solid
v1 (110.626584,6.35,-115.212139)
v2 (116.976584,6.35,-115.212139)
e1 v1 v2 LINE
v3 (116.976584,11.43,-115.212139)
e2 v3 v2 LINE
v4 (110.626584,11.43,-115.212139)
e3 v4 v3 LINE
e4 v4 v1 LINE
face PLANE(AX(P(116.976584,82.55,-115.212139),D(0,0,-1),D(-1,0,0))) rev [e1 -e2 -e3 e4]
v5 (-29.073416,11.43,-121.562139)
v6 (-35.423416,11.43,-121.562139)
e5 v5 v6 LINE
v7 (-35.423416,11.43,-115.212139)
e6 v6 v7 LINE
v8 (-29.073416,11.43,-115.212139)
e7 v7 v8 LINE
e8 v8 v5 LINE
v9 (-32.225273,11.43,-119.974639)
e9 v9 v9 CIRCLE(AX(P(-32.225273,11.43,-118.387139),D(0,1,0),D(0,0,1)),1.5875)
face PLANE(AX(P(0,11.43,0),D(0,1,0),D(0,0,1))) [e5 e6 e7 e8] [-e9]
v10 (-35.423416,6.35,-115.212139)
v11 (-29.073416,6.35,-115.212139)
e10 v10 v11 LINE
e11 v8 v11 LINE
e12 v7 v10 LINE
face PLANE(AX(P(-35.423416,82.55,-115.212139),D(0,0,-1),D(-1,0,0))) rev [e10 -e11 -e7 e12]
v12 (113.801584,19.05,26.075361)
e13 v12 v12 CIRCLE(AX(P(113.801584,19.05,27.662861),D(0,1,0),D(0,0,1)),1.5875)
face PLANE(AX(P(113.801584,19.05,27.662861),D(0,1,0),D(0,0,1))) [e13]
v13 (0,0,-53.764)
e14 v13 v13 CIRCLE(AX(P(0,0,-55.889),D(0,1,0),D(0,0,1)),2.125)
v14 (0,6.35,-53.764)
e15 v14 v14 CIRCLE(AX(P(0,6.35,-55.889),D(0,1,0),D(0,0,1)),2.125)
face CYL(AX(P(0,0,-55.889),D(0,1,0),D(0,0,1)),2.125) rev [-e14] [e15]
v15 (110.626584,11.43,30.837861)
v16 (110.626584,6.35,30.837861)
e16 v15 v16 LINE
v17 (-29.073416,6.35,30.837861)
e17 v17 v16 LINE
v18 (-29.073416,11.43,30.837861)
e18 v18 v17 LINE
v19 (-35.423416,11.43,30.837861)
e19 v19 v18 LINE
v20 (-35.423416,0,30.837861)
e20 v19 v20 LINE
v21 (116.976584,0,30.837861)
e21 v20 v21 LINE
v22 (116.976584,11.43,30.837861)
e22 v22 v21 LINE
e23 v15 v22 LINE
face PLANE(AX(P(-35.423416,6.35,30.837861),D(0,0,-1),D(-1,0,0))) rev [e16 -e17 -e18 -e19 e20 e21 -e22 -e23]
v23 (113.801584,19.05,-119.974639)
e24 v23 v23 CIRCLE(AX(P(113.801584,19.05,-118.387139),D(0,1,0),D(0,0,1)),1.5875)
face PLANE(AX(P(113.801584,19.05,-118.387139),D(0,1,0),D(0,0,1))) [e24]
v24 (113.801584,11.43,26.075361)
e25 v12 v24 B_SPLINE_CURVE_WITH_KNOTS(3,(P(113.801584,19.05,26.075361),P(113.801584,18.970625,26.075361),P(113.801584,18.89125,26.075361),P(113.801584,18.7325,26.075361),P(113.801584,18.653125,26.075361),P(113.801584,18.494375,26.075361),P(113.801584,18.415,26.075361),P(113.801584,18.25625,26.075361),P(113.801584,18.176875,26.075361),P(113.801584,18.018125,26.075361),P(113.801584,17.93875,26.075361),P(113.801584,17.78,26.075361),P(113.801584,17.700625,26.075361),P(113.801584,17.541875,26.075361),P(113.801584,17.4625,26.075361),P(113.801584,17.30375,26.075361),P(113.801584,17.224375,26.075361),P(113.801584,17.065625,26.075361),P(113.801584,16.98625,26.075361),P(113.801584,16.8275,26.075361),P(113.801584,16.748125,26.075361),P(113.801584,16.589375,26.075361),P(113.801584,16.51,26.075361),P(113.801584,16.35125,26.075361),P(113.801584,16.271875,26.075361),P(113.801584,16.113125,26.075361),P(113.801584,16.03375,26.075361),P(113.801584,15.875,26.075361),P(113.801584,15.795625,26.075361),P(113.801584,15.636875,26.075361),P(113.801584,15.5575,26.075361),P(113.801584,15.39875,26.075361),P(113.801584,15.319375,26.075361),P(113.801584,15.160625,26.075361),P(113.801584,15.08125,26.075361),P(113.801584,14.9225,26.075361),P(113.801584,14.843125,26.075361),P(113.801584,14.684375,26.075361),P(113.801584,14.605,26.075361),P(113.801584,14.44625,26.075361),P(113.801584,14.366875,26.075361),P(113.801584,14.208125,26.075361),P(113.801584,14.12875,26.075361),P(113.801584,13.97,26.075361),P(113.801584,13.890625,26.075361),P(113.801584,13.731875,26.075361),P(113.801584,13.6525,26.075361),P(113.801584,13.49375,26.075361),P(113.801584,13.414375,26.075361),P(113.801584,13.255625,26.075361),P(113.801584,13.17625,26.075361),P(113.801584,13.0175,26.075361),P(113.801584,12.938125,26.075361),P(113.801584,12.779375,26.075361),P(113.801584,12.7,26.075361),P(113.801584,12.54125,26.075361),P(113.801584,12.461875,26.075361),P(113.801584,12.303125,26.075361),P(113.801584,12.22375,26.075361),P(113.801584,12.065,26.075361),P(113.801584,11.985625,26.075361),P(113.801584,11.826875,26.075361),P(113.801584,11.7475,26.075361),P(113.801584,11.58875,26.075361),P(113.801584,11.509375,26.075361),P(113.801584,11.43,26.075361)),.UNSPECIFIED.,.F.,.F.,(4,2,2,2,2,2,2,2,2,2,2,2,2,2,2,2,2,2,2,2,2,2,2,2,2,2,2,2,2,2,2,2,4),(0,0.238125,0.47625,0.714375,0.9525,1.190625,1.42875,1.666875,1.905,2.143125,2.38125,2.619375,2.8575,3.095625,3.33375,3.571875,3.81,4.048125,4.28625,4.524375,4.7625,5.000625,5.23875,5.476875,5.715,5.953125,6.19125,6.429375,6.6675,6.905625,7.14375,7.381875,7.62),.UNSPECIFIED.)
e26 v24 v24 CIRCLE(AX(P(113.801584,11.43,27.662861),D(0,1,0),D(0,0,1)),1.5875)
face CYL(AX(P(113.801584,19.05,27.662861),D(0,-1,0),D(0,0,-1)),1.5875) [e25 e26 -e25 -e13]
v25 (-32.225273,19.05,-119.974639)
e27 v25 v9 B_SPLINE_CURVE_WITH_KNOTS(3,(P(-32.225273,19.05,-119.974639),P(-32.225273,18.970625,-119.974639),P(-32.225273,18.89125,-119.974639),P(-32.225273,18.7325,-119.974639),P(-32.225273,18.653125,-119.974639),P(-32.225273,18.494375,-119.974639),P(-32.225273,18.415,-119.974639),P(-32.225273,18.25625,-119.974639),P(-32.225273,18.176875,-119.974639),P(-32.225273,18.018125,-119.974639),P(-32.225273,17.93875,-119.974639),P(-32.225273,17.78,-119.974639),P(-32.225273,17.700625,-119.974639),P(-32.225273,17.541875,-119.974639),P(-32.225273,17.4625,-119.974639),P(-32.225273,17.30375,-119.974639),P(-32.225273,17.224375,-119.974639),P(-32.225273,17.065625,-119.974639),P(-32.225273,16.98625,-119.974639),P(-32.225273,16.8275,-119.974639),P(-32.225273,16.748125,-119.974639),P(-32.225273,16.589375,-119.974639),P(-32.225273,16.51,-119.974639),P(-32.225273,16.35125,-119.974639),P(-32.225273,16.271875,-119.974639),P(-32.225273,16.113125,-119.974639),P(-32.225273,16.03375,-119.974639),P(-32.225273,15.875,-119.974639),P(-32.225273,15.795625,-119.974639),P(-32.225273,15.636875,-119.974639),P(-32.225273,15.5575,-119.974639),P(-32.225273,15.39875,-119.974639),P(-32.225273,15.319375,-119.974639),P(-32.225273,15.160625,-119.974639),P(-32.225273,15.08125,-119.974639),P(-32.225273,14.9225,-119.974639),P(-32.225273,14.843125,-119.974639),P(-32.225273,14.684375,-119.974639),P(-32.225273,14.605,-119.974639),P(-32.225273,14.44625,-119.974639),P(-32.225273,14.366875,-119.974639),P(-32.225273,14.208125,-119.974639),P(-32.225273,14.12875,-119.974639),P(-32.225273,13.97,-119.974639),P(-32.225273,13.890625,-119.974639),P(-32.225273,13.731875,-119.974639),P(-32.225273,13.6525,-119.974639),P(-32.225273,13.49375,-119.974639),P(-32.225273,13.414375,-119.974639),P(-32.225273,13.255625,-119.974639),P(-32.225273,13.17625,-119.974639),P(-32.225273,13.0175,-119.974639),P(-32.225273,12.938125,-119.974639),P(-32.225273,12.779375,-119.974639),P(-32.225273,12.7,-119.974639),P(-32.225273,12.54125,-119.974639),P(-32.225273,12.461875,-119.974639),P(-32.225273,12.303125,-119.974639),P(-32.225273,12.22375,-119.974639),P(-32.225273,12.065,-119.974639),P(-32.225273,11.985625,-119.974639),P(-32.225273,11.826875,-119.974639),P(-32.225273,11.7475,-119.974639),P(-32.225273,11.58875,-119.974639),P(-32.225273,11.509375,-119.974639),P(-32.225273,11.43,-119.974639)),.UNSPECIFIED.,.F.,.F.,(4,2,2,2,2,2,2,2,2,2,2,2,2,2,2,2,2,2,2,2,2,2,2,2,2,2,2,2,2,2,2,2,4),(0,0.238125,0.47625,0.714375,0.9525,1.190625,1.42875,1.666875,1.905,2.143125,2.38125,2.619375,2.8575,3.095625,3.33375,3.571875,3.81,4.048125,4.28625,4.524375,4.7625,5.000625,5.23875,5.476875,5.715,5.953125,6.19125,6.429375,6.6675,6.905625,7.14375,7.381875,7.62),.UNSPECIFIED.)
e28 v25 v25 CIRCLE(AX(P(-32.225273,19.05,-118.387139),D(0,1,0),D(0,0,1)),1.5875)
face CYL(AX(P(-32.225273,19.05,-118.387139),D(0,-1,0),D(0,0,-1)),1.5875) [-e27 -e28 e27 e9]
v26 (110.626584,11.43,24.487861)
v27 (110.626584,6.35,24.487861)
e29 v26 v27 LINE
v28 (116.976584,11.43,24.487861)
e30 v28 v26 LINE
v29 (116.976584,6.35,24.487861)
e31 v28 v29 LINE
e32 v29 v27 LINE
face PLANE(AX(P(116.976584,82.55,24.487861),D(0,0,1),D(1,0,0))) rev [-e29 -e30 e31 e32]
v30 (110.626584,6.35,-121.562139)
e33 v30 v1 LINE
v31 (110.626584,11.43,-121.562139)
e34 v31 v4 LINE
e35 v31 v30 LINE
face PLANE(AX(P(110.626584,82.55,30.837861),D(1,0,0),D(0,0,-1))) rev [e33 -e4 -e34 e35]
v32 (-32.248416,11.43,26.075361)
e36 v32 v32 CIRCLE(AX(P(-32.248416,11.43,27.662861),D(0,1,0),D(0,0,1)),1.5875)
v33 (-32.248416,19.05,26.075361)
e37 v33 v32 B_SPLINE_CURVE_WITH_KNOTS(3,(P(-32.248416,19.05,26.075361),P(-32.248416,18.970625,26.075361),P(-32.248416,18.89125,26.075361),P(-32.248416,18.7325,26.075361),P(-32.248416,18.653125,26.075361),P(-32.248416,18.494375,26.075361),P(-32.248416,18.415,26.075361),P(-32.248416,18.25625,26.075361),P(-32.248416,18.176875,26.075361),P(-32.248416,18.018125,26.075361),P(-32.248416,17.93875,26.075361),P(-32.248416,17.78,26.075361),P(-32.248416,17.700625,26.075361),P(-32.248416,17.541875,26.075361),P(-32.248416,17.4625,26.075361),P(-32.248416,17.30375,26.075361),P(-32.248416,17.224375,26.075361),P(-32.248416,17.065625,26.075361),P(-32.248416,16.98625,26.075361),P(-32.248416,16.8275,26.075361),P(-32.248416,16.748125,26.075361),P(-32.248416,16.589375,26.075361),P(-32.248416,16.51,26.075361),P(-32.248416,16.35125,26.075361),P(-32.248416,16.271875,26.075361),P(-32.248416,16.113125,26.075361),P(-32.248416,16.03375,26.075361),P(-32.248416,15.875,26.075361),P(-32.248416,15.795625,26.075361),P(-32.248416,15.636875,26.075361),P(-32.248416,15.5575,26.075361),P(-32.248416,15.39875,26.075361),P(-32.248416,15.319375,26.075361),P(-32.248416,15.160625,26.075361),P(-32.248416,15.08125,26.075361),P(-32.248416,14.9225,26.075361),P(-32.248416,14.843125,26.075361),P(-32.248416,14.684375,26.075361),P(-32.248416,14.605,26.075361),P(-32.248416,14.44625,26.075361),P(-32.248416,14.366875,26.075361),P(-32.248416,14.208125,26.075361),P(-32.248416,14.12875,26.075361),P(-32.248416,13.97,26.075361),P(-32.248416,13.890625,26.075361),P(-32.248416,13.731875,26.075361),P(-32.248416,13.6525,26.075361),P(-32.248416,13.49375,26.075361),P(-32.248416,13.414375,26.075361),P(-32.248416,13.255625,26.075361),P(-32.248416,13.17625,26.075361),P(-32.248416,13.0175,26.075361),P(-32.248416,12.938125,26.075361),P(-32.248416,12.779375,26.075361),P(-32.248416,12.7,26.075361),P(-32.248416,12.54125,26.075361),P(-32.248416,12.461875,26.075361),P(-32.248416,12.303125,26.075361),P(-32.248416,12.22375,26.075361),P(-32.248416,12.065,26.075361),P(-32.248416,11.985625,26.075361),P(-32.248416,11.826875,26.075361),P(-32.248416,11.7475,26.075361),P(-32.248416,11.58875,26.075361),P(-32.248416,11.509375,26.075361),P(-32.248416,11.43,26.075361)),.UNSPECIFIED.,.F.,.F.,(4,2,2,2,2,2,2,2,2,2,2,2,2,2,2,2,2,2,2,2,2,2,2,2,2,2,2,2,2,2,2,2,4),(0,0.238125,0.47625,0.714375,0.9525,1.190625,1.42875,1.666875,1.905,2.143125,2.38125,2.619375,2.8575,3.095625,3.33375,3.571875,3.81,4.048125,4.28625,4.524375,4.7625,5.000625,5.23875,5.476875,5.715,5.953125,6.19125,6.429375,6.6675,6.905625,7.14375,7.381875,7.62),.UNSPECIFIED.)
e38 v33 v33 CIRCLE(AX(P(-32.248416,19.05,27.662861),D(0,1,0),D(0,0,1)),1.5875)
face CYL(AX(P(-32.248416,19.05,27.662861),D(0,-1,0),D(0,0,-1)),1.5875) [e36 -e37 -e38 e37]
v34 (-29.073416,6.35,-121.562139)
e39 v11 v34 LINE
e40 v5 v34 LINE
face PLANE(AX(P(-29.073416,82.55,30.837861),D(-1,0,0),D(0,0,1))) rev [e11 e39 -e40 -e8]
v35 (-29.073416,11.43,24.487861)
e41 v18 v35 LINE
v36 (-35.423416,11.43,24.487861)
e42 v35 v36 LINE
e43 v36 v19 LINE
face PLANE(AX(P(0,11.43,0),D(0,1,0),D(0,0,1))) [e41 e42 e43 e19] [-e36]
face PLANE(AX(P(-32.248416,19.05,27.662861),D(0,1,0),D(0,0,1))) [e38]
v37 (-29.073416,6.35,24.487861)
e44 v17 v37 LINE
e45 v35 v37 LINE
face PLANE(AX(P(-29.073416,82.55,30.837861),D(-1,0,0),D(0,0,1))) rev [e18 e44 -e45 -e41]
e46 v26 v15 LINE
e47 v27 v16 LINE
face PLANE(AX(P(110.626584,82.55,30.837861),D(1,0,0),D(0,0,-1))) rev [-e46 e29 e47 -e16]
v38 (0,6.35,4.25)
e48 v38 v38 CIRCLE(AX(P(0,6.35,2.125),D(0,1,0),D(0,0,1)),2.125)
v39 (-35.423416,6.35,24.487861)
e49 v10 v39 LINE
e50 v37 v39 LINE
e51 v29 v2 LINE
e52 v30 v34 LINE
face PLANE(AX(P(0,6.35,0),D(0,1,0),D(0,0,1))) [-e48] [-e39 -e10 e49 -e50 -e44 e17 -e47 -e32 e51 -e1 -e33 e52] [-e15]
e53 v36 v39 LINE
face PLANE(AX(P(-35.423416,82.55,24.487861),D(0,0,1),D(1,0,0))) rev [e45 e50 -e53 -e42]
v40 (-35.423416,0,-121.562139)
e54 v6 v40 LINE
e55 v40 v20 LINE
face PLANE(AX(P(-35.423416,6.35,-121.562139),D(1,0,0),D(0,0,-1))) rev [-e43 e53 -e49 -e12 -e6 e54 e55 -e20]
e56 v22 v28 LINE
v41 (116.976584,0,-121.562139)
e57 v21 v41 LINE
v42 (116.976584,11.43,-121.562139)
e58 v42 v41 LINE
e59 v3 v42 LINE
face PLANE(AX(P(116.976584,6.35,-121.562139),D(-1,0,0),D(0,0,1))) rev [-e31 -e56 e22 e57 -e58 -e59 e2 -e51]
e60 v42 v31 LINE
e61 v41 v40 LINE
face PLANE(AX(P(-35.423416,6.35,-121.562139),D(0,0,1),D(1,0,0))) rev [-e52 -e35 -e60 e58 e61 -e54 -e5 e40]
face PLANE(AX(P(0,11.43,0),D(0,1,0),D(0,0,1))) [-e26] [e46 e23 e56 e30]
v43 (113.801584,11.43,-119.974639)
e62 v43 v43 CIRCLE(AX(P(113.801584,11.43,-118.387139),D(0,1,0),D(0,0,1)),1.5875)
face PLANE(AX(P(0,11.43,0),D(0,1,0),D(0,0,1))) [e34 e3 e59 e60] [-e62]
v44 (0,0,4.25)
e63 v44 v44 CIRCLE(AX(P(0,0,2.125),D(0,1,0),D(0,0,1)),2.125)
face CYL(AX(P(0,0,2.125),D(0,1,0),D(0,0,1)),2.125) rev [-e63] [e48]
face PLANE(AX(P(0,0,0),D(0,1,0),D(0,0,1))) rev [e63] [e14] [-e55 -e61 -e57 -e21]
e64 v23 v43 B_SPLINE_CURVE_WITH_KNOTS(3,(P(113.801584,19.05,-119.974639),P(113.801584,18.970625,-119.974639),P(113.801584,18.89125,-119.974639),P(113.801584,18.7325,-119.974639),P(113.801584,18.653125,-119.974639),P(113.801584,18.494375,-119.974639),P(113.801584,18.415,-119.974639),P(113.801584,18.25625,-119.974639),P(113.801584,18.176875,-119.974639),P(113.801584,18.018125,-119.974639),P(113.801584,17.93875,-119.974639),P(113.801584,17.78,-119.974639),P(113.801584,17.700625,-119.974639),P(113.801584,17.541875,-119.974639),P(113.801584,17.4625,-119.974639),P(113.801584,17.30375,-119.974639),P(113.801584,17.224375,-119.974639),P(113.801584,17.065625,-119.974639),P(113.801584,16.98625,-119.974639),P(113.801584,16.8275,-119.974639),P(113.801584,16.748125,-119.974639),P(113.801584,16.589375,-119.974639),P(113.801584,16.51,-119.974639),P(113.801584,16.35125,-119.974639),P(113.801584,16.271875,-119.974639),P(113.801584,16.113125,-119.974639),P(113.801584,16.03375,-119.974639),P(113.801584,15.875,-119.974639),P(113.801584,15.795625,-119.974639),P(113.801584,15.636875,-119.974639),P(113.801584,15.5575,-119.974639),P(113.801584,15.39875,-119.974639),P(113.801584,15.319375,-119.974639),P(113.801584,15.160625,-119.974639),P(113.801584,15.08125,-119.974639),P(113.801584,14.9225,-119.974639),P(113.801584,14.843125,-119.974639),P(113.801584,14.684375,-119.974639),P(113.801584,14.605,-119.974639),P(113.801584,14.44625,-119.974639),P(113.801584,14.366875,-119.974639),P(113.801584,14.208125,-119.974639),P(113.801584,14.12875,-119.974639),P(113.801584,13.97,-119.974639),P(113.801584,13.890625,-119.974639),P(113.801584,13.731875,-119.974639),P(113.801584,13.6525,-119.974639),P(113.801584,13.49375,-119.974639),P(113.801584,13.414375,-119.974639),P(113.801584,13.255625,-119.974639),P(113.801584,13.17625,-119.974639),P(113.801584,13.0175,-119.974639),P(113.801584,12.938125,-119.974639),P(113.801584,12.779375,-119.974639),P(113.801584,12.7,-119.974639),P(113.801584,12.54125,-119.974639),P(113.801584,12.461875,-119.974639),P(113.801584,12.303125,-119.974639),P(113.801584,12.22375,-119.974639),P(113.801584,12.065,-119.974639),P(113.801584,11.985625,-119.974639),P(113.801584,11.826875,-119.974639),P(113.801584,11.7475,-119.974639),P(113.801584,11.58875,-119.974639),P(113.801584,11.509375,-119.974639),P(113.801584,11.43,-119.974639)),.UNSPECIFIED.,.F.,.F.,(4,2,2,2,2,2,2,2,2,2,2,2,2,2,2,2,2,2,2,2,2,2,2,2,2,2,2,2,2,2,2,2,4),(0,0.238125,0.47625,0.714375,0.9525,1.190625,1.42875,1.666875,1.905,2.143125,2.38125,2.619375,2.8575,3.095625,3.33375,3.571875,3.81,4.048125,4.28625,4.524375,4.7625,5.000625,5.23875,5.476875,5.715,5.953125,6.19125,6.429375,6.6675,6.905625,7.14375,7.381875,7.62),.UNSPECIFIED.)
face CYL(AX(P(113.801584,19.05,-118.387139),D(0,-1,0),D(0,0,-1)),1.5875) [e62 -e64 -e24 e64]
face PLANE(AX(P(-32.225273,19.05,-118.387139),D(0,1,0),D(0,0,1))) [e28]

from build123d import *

# Parameters (mm, degrees)
STOCK_PLATE_BETA1_1_OUTLINE_W   = 152.4
STOCK_PLATE_BETA1_1_OUTLINE_H   = 152.4
STOCK_PLATE_BETA1_1_OUTLINE_R   = 2.125
STOCK_PLATE_BETA1_1_DEPTH       = 6.35
STOCK_PLATE_BETA1_1_START       = 6.35
STOCK_PLATE_BETA1_1_2_OUTLINE_W = 6.35
STOCK_PLATE_BETA1_1_2_OUTLINE_H = 6.35
STOCK_PLATE_BETA1_1_2_DEPTH     = 5.08
SKETCH1_R                       = 1.5875
BOSS_EXTRUDE1_DEPTH             = 7.62


# Read off the part's stored shape, not the designer's step: Stock-plate_beta1-1
with BuildPart() as part:
    # Stock-plate_beta1-1 outline → Stock-plate_beta1-1 (new body)
    with BuildSketch(Plane(origin=(0, 0, 0), x_dir=(1, 0, 0), z_dir=(0, 1, 0))):
        with Locations((40.776583963, 45.362139437)):
            Rectangle(STOCK_PLATE_BETA1_1_OUTLINE_W, STOCK_PLATE_BETA1_1_OUTLINE_H)
        with Locations((0, -2.125)):
            Circle(STOCK_PLATE_BETA1_1_OUTLINE_R, mode=Mode.SUBTRACT)
        with Locations((0, 55.889)):
            Circle(STOCK_PLATE_BETA1_1_OUTLINE_R, mode=Mode.SUBTRACT)
    extrude(amount=STOCK_PLATE_BETA1_1_DEPTH)

    # Stock-plate_beta1-1 2 outline → Stock-plate_beta1-1 2 (add)
    with BuildSketch(Plane(origin=(0, 0, 0), x_dir=(1, 0, 0), z_dir=(0, 1, 0)).offset(STOCK_PLATE_BETA1_1_START)):
        with Locations((113.801583963, 118.387139437)):
            Rectangle(STOCK_PLATE_BETA1_1_2_OUTLINE_W, STOCK_PLATE_BETA1_1_2_OUTLINE_H)
        with Locations((-32.248416037, 118.387139437)):
            Rectangle(STOCK_PLATE_BETA1_1_2_OUTLINE_W, STOCK_PLATE_BETA1_1_2_OUTLINE_H)
        with Locations((113.801583963, -27.662860563)):
            Rectangle(STOCK_PLATE_BETA1_1_2_OUTLINE_W, STOCK_PLATE_BETA1_1_2_OUTLINE_H)
        with Locations((-32.248416037, -27.662860563)):
            Rectangle(STOCK_PLATE_BETA1_1_2_OUTLINE_W, STOCK_PLATE_BETA1_1_2_OUTLINE_H)
    extrude(amount=STOCK_PLATE_BETA1_1_2_DEPTH)

    # Sketch1 → Boss-Extrude1 (add)
    with BuildSketch(Plane(origin=(0, 11.43, 0), x_dir=(1, 0, 0), z_dir=(0, 1, 0))):
        with Locations(Location((-32.248416037, -27.662860563, 0), (0, 0, 90))):
            Circle(SKETCH1_R)
        with Locations(Location((-32.225272977, 118.387139437, 0), (0, 0, 90))):
            Circle(SKETCH1_R)
        with Locations(Location((113.801583963, 118.387139437, 0), (0, 0, 90))):
            Circle(SKETCH1_R)
        with Locations(Location((113.801583963, -27.662860563, 0), (0, 0, 90))):
            Circle(SKETCH1_R)
    extrude(amount=BOSS_EXTRUDE1_DEPTH)


solid = part.part
